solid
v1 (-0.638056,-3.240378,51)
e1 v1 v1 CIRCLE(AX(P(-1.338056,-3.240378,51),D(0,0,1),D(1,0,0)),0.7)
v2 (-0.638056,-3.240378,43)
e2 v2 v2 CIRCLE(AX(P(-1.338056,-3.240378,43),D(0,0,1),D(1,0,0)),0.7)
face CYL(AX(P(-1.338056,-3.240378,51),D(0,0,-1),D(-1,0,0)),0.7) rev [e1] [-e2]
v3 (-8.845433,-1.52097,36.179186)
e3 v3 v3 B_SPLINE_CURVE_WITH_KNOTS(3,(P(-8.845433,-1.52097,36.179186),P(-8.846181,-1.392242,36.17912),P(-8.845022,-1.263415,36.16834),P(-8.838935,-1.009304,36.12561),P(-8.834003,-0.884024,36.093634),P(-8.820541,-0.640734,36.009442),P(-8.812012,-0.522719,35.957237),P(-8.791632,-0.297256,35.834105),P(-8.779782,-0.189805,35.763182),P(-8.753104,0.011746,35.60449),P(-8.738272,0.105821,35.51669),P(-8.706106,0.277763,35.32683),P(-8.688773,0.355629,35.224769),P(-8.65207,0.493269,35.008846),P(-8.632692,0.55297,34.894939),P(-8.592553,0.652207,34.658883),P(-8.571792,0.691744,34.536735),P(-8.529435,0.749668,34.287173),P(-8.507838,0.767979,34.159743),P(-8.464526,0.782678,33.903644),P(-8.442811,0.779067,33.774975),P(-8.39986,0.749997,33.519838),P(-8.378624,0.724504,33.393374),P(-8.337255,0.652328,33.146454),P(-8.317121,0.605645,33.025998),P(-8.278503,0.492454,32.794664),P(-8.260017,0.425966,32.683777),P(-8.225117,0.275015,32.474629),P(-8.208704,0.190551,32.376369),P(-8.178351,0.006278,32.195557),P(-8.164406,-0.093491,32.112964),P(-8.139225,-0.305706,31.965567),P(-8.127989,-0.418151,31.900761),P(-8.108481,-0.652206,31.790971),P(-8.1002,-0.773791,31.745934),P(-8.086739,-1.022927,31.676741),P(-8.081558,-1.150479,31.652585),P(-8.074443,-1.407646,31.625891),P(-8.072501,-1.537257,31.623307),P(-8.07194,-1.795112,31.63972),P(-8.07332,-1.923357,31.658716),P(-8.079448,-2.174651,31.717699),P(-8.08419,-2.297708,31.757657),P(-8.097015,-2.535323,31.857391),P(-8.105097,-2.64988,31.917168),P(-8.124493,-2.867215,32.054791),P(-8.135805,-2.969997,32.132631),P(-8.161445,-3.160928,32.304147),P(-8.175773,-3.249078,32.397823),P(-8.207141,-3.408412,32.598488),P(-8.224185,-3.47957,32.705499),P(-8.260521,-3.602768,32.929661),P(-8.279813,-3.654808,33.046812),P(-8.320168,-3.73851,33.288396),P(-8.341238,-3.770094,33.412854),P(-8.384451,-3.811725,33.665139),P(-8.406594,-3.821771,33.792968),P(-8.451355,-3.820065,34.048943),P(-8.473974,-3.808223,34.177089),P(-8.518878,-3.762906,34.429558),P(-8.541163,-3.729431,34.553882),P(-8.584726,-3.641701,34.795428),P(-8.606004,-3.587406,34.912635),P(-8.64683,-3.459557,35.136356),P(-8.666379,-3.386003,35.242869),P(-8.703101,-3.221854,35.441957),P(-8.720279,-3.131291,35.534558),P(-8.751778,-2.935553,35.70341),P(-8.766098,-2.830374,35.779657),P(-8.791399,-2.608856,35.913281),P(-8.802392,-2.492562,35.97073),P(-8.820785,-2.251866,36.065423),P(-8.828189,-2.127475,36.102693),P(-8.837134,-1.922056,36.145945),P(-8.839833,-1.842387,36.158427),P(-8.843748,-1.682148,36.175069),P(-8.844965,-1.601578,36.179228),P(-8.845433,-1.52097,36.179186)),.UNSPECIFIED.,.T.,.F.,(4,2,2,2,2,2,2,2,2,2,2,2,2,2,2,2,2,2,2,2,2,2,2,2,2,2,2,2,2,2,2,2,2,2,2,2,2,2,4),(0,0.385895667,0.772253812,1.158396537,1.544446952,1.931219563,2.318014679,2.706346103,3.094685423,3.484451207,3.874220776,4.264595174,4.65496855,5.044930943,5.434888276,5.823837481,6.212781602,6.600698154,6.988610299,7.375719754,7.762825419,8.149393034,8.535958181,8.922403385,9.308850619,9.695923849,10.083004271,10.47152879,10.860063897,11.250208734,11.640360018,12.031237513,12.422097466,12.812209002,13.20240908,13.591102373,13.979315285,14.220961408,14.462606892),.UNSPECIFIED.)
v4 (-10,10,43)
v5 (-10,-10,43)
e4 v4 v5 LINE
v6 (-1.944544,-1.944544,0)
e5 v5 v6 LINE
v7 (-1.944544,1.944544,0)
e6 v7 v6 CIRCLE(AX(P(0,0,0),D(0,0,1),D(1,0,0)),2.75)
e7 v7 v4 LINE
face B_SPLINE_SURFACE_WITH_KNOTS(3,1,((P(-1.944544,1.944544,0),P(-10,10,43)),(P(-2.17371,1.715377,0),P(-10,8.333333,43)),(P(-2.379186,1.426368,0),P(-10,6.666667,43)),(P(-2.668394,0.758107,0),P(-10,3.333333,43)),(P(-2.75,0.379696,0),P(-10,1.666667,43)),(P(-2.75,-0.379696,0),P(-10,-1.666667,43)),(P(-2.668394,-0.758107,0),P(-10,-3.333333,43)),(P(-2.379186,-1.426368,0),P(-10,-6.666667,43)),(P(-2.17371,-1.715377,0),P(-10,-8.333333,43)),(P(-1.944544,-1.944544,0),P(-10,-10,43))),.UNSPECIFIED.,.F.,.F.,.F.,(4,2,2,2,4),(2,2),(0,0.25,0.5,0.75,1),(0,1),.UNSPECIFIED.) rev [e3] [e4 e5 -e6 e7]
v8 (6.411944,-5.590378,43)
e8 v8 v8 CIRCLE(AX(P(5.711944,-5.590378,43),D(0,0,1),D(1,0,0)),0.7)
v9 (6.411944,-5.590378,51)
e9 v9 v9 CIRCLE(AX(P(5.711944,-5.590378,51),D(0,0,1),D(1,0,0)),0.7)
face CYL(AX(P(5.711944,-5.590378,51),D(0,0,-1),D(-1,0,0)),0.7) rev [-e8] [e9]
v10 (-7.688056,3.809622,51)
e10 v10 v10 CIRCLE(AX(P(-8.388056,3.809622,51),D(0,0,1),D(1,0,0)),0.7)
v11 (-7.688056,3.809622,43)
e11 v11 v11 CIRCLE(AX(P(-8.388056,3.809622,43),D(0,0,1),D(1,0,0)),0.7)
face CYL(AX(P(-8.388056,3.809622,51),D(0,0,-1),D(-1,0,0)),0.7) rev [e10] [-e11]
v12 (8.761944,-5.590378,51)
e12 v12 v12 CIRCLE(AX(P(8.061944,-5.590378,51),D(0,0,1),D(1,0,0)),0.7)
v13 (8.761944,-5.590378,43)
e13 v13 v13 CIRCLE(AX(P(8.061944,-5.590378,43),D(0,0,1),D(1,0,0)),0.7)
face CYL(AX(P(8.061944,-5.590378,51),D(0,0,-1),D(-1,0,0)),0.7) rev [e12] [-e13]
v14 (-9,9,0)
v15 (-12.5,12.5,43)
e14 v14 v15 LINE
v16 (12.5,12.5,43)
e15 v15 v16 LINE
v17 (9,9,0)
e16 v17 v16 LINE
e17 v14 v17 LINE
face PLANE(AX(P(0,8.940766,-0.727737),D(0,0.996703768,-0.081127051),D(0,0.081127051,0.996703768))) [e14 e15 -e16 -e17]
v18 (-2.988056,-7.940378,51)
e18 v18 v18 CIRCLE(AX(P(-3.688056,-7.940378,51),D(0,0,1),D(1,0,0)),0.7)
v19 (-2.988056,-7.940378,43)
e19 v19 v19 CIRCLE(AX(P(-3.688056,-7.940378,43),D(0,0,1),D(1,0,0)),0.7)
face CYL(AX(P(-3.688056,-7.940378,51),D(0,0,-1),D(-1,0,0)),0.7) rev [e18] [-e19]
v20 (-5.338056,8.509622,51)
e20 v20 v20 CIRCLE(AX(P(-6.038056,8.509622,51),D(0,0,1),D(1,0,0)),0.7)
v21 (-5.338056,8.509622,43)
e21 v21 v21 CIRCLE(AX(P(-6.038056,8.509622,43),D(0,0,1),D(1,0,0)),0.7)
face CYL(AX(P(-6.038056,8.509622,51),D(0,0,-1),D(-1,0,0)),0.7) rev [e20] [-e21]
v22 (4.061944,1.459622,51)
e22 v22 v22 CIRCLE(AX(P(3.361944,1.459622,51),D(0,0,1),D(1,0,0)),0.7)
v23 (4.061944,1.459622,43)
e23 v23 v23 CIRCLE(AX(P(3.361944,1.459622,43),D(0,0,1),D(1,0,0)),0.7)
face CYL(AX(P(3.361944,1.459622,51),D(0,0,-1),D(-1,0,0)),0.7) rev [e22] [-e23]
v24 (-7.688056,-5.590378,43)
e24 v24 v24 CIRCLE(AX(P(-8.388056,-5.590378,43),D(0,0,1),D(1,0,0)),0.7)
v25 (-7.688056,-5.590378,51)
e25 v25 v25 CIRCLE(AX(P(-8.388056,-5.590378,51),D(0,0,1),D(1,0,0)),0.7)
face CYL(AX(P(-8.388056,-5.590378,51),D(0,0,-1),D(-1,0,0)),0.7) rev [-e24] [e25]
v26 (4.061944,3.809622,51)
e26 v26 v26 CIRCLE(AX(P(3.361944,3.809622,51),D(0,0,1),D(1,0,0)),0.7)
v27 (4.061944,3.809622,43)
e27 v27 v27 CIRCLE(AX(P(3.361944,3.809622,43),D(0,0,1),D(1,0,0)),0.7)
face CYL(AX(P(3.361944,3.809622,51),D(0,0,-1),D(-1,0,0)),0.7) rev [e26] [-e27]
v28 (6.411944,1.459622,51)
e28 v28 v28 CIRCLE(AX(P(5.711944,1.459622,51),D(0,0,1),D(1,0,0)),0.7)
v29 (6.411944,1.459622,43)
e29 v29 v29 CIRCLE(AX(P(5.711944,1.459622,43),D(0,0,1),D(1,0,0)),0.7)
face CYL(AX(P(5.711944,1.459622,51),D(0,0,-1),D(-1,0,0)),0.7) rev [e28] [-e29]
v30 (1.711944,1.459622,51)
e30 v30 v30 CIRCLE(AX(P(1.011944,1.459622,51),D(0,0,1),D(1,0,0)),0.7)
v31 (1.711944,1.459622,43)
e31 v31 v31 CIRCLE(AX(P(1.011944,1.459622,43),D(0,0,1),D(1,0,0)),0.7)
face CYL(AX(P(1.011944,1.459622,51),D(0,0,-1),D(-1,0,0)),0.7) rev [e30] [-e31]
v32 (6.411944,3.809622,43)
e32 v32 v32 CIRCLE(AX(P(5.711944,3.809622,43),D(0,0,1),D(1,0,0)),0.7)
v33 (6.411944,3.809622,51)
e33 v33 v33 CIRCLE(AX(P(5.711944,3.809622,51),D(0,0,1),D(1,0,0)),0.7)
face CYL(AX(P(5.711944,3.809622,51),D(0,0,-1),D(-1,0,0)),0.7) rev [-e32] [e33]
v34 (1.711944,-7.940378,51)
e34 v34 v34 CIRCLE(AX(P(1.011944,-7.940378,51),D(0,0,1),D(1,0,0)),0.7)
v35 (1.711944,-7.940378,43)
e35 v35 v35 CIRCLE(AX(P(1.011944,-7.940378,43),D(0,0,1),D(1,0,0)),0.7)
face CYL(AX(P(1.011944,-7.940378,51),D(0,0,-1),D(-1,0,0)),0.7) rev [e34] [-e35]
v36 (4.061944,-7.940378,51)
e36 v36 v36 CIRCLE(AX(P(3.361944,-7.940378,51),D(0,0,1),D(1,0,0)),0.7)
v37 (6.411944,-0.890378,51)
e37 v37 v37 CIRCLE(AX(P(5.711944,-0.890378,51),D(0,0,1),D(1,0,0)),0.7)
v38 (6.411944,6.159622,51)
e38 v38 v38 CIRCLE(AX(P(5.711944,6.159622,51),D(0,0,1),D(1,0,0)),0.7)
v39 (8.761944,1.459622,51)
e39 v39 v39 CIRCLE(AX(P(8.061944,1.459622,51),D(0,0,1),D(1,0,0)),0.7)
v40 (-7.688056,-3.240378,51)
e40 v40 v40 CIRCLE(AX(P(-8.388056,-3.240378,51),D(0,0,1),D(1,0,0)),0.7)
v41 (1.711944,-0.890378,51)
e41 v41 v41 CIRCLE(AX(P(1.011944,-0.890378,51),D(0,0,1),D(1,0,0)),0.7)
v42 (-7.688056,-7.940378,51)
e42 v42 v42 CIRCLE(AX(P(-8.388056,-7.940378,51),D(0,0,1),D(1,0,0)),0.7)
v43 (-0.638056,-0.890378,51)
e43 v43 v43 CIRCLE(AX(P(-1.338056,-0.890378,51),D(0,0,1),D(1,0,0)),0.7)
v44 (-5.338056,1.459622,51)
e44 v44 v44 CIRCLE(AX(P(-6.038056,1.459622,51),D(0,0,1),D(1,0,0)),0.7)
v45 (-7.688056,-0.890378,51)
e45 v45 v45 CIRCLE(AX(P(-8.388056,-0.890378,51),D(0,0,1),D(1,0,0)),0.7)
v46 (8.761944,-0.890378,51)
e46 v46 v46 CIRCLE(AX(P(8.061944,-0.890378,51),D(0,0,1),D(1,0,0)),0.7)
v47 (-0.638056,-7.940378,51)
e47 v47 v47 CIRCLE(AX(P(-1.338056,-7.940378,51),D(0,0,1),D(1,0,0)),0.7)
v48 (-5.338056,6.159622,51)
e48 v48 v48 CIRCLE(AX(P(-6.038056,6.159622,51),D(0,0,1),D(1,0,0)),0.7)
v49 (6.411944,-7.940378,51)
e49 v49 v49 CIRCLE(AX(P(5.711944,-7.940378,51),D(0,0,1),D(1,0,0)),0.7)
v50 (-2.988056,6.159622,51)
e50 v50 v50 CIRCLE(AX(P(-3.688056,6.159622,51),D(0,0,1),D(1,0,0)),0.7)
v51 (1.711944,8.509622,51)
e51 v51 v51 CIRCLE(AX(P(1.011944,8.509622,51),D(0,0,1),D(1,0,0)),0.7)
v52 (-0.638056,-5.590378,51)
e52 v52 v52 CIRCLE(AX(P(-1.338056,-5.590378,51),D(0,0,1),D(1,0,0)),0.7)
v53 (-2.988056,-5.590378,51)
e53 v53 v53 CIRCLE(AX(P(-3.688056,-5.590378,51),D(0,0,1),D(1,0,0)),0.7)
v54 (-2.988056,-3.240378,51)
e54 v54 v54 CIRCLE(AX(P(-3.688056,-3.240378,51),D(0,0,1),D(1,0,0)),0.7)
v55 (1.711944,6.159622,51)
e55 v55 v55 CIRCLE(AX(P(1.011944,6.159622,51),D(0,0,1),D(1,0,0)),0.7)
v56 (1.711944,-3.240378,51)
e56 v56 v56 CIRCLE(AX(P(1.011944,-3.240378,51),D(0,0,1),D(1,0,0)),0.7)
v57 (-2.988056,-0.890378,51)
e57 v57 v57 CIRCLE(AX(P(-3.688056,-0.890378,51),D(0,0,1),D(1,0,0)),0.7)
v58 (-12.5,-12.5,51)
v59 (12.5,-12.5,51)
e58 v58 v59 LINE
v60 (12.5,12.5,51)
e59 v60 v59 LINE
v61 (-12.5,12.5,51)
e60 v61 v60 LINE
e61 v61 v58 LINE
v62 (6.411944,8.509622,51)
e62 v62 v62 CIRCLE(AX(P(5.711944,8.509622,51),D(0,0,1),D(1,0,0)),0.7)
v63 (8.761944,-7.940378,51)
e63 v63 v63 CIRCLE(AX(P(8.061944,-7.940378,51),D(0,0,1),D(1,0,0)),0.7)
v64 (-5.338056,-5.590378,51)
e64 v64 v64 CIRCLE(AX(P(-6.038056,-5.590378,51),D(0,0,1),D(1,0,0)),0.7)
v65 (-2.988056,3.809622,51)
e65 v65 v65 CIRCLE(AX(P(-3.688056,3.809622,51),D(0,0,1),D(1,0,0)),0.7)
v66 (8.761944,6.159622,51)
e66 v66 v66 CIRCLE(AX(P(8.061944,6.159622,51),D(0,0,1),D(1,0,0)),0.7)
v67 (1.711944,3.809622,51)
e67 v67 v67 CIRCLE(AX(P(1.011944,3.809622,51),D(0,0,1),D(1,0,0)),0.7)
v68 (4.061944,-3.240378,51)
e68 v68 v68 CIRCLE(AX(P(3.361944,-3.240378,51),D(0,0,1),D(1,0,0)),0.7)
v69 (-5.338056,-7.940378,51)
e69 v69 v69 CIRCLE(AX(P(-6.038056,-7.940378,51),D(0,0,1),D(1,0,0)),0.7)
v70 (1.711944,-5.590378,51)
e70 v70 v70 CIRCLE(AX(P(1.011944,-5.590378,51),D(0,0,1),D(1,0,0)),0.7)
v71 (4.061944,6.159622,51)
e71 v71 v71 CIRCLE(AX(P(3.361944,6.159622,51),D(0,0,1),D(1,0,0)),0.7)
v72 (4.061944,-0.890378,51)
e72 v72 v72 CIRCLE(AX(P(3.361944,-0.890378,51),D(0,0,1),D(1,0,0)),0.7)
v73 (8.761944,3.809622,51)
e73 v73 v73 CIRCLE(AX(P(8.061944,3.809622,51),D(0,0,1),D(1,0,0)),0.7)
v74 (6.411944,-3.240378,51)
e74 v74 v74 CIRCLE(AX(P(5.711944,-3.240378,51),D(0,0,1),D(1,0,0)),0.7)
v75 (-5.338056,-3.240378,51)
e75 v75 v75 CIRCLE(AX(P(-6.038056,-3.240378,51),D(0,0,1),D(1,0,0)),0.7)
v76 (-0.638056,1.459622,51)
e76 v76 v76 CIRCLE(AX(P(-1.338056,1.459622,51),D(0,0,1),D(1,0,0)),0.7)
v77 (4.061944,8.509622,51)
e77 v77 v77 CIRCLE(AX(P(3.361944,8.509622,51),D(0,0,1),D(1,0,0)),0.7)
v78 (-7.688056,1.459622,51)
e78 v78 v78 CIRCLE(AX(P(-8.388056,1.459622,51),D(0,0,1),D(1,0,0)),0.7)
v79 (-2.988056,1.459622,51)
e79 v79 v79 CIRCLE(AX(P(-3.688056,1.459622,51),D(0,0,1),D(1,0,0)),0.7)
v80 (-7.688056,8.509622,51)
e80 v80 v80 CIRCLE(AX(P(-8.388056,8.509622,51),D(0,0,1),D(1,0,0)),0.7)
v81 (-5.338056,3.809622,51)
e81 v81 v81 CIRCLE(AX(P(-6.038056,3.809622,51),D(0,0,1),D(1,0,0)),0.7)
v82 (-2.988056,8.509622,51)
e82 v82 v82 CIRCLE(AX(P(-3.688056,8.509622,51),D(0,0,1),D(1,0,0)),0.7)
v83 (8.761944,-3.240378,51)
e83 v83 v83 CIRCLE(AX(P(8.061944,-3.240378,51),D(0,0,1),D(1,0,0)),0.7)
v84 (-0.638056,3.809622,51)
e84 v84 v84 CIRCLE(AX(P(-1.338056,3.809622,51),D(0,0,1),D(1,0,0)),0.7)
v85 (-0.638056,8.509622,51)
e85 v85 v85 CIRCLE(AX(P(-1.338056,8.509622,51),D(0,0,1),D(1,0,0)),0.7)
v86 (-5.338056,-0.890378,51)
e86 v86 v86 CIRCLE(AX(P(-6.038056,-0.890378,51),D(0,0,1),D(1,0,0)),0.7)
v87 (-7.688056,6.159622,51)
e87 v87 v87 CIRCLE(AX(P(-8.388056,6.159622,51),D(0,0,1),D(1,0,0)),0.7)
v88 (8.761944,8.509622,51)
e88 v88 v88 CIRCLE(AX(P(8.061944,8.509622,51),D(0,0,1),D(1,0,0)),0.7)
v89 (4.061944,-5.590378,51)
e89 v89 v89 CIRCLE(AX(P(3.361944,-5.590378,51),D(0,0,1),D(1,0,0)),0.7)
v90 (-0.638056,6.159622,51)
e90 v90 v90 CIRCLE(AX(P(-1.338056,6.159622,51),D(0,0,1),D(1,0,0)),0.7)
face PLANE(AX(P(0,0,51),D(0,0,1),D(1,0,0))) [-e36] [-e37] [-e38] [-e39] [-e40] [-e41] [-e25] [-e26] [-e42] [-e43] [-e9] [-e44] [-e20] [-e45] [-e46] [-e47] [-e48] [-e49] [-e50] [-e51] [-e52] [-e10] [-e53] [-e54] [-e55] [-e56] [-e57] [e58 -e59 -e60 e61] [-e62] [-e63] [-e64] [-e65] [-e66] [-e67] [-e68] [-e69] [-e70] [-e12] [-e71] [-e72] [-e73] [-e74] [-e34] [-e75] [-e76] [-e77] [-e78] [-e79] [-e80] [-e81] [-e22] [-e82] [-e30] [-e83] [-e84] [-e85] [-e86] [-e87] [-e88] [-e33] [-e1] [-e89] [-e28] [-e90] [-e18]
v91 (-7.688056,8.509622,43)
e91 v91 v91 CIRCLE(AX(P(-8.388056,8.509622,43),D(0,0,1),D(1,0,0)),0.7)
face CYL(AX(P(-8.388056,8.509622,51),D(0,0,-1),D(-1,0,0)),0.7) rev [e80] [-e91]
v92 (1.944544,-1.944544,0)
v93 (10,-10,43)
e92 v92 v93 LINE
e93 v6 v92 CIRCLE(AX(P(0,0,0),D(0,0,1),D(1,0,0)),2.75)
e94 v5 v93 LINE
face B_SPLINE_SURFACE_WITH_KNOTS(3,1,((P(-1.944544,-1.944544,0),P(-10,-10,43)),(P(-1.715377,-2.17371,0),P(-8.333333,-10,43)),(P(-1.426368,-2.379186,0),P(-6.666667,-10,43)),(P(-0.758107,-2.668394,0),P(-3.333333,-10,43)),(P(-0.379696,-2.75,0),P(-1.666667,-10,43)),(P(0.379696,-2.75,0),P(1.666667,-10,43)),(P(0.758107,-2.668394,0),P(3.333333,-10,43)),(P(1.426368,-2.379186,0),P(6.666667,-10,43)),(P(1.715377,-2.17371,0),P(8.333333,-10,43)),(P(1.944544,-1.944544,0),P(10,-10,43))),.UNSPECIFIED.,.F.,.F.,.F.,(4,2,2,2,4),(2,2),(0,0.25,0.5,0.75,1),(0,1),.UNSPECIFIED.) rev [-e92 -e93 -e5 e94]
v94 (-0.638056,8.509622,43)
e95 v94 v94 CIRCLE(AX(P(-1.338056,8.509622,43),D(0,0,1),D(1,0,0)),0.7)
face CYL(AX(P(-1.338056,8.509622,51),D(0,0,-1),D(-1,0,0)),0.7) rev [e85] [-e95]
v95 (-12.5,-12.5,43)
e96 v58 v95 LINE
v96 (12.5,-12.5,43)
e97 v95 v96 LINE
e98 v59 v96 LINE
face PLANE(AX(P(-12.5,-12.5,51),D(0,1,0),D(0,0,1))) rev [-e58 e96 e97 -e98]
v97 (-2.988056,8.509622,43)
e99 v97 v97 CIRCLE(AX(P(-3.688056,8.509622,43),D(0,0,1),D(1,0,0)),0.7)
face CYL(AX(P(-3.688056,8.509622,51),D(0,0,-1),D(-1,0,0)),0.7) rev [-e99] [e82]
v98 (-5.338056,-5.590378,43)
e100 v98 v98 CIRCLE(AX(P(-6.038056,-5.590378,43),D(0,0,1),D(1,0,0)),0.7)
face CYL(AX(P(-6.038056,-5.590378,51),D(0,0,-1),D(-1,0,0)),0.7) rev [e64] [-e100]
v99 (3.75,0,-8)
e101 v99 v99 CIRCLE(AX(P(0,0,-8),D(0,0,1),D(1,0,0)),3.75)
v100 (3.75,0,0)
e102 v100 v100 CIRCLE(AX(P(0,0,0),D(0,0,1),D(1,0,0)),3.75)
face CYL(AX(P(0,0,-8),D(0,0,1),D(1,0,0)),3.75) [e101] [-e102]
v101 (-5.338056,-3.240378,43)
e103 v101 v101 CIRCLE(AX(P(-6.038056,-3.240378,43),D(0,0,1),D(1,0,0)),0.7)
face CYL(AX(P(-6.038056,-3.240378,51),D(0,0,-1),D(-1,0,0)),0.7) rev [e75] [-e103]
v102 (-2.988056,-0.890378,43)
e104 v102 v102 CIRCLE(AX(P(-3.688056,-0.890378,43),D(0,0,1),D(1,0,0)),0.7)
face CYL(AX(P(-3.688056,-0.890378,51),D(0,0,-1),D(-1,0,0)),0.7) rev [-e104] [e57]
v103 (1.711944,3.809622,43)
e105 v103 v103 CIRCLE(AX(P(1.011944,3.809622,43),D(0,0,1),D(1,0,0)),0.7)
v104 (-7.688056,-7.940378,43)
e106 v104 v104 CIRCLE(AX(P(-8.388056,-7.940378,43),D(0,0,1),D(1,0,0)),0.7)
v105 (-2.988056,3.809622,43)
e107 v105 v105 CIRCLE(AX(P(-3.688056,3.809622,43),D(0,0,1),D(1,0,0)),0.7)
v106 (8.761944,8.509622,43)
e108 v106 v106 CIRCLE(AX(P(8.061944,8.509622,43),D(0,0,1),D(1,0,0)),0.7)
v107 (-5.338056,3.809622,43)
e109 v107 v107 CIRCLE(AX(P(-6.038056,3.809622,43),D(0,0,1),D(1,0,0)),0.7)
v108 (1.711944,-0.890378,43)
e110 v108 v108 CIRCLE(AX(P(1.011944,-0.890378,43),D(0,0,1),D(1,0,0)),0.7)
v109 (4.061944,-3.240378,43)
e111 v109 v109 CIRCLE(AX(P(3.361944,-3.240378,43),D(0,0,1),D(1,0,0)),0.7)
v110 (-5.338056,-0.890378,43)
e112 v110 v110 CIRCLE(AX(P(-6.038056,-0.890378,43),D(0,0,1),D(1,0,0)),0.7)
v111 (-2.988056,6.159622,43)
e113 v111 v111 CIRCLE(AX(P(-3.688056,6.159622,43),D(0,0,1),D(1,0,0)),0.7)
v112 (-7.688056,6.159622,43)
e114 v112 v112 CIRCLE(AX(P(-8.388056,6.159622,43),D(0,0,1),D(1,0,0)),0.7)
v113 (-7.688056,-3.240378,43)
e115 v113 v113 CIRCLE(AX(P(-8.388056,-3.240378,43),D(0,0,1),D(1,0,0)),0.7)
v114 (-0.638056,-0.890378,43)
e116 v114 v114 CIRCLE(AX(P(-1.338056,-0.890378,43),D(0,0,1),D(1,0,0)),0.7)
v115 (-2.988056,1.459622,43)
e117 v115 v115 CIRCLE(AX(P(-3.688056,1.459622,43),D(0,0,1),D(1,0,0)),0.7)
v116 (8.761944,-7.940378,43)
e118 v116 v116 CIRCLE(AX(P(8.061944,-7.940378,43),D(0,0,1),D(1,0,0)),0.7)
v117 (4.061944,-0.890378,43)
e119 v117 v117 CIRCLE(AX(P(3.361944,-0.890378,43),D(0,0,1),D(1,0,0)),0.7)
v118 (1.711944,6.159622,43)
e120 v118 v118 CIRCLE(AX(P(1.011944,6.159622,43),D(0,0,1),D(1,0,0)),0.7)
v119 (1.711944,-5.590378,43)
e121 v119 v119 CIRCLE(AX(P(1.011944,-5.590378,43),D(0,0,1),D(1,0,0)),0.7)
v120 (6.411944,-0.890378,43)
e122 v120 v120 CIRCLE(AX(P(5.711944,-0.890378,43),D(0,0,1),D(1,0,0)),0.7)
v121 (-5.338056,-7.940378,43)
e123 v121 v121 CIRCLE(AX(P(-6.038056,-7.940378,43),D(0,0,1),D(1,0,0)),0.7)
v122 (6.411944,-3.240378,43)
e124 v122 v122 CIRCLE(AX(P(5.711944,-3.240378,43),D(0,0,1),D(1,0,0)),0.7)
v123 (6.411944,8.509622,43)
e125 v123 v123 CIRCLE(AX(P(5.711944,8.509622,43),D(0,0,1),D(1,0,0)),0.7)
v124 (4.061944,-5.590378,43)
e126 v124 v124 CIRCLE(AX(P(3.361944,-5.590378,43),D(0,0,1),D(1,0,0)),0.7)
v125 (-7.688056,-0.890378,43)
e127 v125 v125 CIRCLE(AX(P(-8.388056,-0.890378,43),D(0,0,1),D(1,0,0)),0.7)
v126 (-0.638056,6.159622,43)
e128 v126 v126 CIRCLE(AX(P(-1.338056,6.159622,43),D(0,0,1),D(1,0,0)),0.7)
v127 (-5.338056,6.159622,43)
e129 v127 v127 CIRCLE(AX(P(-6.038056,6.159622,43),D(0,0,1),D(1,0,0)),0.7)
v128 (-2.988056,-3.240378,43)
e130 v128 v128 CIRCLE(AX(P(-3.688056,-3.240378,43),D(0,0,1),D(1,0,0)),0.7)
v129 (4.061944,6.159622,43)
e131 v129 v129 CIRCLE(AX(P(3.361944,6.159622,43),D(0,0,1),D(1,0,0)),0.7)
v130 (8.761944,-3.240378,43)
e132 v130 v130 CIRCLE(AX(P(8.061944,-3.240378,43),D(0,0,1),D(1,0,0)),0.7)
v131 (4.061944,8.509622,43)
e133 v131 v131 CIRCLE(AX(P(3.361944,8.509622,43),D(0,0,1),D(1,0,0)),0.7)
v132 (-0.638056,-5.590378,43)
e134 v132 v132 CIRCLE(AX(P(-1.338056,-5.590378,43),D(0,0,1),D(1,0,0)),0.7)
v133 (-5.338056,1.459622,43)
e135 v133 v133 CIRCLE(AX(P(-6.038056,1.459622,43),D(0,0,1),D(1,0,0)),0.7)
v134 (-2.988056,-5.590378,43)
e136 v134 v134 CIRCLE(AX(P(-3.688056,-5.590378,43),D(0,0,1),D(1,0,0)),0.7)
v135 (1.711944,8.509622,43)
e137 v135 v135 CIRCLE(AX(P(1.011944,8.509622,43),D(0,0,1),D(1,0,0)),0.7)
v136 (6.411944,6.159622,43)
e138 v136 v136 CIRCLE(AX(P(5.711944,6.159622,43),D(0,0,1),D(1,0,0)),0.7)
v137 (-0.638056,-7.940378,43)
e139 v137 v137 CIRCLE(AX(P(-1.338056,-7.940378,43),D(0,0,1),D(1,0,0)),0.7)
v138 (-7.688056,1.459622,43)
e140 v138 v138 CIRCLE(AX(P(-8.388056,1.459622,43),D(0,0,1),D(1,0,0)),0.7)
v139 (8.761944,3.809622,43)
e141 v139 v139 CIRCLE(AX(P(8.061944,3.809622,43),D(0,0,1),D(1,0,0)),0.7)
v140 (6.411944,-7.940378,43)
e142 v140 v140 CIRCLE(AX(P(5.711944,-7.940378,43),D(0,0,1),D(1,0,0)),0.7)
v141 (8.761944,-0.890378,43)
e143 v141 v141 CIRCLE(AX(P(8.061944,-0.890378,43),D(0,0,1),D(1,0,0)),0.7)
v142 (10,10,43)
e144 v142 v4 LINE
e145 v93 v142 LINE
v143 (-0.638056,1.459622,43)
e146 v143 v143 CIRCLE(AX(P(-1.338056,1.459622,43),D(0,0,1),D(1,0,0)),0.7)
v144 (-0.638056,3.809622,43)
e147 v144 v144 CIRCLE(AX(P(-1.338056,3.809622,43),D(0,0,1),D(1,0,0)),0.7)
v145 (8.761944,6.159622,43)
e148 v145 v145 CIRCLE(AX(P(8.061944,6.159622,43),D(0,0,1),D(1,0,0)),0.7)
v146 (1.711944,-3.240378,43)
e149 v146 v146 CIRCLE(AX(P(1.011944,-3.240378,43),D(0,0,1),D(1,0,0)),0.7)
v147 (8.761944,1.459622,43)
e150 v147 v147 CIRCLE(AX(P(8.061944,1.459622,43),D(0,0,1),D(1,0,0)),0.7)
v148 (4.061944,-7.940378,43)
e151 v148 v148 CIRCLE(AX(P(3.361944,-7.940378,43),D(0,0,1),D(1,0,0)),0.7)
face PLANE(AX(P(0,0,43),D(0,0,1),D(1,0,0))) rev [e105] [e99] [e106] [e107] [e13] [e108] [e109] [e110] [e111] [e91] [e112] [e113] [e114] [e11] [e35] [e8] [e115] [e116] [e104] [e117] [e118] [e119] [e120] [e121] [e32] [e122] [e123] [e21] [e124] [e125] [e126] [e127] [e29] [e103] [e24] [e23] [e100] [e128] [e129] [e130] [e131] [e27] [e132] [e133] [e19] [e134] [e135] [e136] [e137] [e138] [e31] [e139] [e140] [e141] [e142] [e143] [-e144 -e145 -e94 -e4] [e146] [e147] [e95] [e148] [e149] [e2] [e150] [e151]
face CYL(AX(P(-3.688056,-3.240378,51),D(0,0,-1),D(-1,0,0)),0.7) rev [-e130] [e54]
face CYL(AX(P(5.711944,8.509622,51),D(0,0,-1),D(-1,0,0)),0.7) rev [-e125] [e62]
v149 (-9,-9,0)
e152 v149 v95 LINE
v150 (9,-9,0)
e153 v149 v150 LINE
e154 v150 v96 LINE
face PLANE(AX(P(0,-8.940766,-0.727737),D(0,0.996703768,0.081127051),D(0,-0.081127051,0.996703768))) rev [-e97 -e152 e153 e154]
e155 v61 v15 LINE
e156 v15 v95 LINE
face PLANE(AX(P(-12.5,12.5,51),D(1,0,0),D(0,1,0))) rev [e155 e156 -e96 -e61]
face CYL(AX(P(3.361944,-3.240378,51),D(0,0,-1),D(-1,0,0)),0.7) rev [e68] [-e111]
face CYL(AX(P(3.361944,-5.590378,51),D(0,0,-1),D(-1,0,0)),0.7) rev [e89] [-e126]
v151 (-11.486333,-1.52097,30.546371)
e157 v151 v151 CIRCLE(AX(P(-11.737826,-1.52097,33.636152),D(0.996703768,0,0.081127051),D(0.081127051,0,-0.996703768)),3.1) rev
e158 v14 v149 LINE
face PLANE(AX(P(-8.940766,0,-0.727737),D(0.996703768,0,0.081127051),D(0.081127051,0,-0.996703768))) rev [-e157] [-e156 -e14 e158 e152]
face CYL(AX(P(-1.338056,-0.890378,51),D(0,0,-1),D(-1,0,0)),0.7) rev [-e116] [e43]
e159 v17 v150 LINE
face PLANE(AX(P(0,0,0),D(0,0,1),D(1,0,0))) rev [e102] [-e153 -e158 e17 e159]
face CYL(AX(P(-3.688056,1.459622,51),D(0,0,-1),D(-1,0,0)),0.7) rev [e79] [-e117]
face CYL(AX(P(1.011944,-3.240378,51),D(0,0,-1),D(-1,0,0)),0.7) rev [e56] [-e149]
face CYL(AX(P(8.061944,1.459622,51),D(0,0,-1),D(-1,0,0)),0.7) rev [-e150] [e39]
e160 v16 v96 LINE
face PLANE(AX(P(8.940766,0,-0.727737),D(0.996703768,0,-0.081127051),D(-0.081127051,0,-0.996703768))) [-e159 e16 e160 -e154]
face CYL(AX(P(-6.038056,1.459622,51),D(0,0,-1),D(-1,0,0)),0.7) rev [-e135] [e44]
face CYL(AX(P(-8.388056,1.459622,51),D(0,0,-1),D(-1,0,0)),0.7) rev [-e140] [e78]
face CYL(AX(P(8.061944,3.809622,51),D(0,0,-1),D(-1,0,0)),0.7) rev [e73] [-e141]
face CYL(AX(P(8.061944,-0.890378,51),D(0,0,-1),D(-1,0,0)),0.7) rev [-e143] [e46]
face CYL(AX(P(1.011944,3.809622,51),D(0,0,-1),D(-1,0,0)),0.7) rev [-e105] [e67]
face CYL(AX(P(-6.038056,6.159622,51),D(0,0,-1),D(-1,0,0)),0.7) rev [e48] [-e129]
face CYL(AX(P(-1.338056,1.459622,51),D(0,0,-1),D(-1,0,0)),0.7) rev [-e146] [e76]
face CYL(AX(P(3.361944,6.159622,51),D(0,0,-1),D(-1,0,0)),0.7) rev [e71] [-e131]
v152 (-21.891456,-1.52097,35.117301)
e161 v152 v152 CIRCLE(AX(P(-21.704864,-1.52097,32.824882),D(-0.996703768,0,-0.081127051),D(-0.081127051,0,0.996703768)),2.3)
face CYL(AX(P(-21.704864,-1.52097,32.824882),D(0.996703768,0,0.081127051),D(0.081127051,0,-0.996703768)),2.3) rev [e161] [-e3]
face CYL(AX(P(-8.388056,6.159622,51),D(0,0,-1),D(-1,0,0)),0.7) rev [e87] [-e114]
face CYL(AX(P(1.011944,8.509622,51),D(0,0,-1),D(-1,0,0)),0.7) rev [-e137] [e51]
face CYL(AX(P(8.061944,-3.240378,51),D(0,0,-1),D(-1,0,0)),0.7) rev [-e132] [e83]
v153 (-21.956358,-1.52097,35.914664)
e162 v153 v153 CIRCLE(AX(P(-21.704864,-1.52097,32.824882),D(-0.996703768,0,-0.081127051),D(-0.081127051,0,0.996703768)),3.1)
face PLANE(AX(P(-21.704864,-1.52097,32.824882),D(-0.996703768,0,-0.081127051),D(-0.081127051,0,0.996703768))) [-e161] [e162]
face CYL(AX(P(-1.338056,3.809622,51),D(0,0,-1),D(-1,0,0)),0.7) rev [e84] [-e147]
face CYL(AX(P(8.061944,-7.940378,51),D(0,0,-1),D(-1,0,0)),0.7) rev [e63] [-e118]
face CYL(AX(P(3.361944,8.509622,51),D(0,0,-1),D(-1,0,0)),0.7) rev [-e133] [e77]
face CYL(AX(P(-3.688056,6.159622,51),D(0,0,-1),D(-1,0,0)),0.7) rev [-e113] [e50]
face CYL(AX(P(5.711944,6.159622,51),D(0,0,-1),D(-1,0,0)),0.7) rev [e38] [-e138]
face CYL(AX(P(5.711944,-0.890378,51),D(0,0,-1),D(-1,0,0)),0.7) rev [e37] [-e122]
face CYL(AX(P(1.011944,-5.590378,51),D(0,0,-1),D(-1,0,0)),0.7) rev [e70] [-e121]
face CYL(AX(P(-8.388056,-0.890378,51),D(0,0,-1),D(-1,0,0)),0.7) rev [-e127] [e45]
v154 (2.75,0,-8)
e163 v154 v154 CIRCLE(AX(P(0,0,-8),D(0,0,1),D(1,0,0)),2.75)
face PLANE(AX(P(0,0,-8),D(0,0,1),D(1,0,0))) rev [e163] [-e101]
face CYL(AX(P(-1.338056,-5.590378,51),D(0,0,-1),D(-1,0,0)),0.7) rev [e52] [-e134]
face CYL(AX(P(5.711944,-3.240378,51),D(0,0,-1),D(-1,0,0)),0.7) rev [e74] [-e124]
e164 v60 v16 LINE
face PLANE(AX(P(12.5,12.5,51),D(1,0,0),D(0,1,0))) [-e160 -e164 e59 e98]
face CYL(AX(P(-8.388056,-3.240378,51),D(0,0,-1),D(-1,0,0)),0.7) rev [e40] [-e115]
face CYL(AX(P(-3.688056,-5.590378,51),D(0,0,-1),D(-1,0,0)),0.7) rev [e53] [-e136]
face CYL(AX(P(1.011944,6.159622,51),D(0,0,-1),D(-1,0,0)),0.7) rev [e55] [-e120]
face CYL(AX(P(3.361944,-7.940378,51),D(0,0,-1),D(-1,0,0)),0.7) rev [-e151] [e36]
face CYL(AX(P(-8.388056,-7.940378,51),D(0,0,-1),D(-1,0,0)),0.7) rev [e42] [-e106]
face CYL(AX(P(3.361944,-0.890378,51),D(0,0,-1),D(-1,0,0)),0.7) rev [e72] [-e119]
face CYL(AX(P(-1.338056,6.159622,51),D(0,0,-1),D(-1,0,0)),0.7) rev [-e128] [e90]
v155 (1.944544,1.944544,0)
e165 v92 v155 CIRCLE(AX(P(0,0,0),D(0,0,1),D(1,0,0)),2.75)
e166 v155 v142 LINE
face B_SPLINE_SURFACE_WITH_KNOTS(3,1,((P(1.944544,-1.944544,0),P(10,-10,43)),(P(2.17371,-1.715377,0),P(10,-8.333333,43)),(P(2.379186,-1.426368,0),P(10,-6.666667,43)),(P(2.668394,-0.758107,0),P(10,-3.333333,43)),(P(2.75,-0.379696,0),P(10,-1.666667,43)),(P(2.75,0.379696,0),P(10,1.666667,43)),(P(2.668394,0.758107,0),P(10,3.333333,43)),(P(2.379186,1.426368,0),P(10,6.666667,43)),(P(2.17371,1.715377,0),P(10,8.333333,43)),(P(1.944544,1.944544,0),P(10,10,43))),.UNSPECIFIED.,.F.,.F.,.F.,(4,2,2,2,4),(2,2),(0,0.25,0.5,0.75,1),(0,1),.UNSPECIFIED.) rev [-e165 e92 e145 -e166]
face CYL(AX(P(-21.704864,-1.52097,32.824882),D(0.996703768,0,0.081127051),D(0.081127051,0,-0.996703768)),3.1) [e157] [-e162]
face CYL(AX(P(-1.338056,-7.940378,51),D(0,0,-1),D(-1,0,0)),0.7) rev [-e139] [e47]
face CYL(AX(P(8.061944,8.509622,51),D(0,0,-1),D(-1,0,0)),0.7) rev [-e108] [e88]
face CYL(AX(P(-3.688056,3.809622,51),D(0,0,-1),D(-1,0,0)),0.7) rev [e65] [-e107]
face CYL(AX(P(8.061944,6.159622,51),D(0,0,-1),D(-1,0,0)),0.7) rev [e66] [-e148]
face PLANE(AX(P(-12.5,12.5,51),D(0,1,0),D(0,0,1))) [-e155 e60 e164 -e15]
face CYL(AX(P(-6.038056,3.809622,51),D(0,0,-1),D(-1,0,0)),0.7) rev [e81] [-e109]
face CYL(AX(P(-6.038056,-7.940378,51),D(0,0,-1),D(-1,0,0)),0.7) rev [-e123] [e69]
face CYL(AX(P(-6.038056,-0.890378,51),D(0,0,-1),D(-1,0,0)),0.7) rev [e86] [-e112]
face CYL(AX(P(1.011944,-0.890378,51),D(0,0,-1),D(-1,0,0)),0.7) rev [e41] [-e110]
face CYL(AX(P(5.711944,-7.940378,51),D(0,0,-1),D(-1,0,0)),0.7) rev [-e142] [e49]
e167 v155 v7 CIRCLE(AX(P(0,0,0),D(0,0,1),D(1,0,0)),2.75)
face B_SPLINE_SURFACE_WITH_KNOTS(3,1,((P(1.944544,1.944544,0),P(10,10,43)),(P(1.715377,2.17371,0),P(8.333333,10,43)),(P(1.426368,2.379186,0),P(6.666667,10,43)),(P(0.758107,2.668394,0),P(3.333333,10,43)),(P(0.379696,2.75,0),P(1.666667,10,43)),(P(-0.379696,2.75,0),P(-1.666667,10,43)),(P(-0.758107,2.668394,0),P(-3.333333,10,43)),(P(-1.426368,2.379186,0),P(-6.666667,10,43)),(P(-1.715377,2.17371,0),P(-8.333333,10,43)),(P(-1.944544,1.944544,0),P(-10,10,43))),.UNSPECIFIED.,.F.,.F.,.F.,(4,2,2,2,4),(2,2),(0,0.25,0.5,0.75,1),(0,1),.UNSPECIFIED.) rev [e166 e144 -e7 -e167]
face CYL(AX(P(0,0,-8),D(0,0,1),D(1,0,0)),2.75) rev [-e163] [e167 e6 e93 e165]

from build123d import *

# Parameters (mm, degrees)
SKETCH2_4_W         = 25
SKETCH2_4_H         = 25
BOSS_EXTRUDE2_DEPTH = 8
SKETCH5_R           = 0.7
CUT_EXTRUDE1_DEPTH  = 8
SKETCH6_R           = 3.1
SKETCH6_R_2         = 2.3
BOSS_EXTRUDE4_DEPTH = 10
CUT_EXTRUDE2_START  = -4
SKETCH6_4_R         = 2.3
CUT_EXTRUDE2_DEPTH  = 4
SKETCH1_7_R         = 3.75
SKETCH1_7_R_2       = 2.75
BOSS_EXTRUDE7_DEPTH = 8


with BuildPart() as part:
    # Sketch1 → Loft1 section 0
    with BuildSketch(Plane.XY):
        with BuildLine():
            Line((-9, 9), (9, 9))
            Line((9, 9), (9, -9))
            Line((9, -9), (-9, -9))
            Line((-9, -9), (-9, 9))
        make_face()
    # Sketch2 → Loft1 section 1
    with BuildSketch(Plane.XY.offset(43)):
        with BuildLine():
            Line((-12.5, 12.5), (12.5, 12.5))
            Line((12.5, 12.5), (12.5, -12.5))
            Line((12.5, -12.5), (-12.5, -12.5))
            Line((-12.5, -12.5), (-12.5, 12.5))
        make_face()
    loft()

    # Cut-Loft1: read off the stored shape, not the designer's step
    # Cut-Loft1: loft between two sections, ruled curve by curve
    cut_loft1_from = [
        Edge.make_bspline([(-1.944543648, -1.944543648, 0), (-1.715376982, -2.173710315, 0), (-1.426368467, -2.37918614, 0), (-0.758106945, -2.668394189, 0), (-0.379695766, -2.75, 0), (0.379695766, -2.75, 0), (0.758106945, -2.668394189, 0), (1.426368467, -2.37918614, 0), (1.715376982, -2.173710315, 0), (1.944543648, -1.944543648, 0)], [0, 0, 0, 0, 0.25, 0.25, 0.5, 0.5, 0.75, 0.75, 1, 1, 1, 1], 3),
        Edge.make_bspline([(1.944543648, -1.944543648, 0), (2.173710315, -1.715376982, 0), (2.37918614, -1.426368467, 0), (2.668394189, -0.758106945, 0), (2.75, -0.379695766, 0), (2.75, 0.379695766, 0), (2.668394189, 0.758106945, 0), (2.37918614, 1.426368467, 0), (2.173710315, 1.715376982, 0), (1.944543648, 1.944543648, 0)], [0, 0, 0, 0, 0.25, 0.25, 0.5, 0.5, 0.75, 0.75, 1, 1, 1, 1], 3),
        Edge.make_bspline([(-1.944543648, 1.944543648, 0), (-2.173710315, 1.715376982, 0), (-2.37918614, 1.426368467, 0), (-2.668394189, 0.758106945, 0), (-2.75, 0.379695766, 0), (-2.75, -0.379695766, 0), (-2.668394189, -0.758106945, 0), (-2.37918614, -1.426368467, 0), (-2.173710315, -1.715376982, 0), (-1.944543648, -1.944543648, 0)], [0, 0, 0, 0, 0.25, 0.25, 0.5, 0.5, 0.75, 0.75, 1, 1, 1, 1], 3),
        Edge.make_bspline([(1.944543648, 1.944543648, 0), (1.715376982, 2.173710315, 0), (1.426368467, 2.37918614, 0), (0.758106945, 2.668394189, 0), (0.379695766, 2.75, 0), (-0.379695766, 2.75, 0), (-0.758106945, 2.668394189, 0), (-1.426368467, 2.37918614, 0), (-1.715376982, 2.173710315, 0), (-1.944543648, 1.944543648, 0)], [0, 0, 0, 0, 0.25, 0.25, 0.5, 0.5, 0.75, 0.75, 1, 1, 1, 1], 3),
    ]
    cut_loft1_to = [
        Edge.make_bspline([(-10, -10, 43), (-8.333333333, -10, 43), (-6.666666667, -10, 43), (-3.333333333, -10, 43), (-1.666666667, -10, 43), (1.666666667, -10, 43), (3.333333333, -10, 43), (6.666666667, -10, 43), (8.333333333, -10, 43), (10, -10, 43)], [0, 0, 0, 0, 0.25, 0.25, 0.5, 0.5, 0.75, 0.75, 1, 1, 1, 1], 3),
        Edge.make_bspline([(10, -10, 43), (10, -8.333333333, 43), (10, -6.666666667, 43), (10, -3.333333333, 43), (10, -1.666666667, 43), (10, 1.666666667, 43), (10, 3.333333333, 43), (10, 6.666666667, 43), (10, 8.333333333, 43), (10, 10, 43)], [0, 0, 0, 0, 0.25, 0.25, 0.5, 0.5, 0.75, 0.75, 1, 1, 1, 1], 3),
        Edge.make_bspline([(-10, 10, 43), (-10, 8.333333333, 43), (-10, 6.666666667, 43), (-10, 3.333333333, 43), (-10, 1.666666667, 43), (-10, -1.666666667, 43), (-10, -3.333333333, 43), (-10, -6.666666667, 43), (-10, -8.333333333, 43), (-10, -10, 43)], [0, 0, 0, 0, 0.25, 0.25, 0.5, 0.5, 0.75, 0.75, 1, 1, 1, 1], 3),
        Edge.make_bspline([(10, 10, 43), (8.333333333, 10, 43), (6.666666667, 10, 43), (3.333333333, 10, 43), (1.666666667, 10, 43), (-1.666666667, 10, 43), (-3.333333333, 10, 43), (-6.666666667, 10, 43), (-8.333333333, 10, 43), (-10, 10, 43)], [0, 0, 0, 0, 0.25, 0.25, 0.5, 0.5, 0.75, 0.75, 1, 1, 1, 1], 3),
    ]
    cut_loft1 = Solid(Shell([*[Face.make_surface_from_curves(cut_loft1_from[k], cut_loft1_to[k]) for k in range(4)], Face(Wire(cut_loft1_from)), Face(Wire(cut_loft1_to))]))
    add(cut_loft1, mode=Mode.SUBTRACT)

    # Sketch2<4> → Boss-Extrude2 (add)
    with BuildSketch(Plane.XY.offset(43)):
        Rectangle(SKETCH2_4_W, SKETCH2_4_H)
    extrude(amount=BOSS_EXTRUDE2_DEPTH)

    # Sketch5 → Cut-Extrude1 (cut)
    with BuildSketch(Plane.XY.offset(43)):
        with Locations((-8.388056057, 8.509622087)):
            Circle(SKETCH5_R)
        with Locations((-6.038056057, 8.509622087)):
            Circle(SKETCH5_R)
        with Locations((-3.688056057, 8.509622087)):
            Circle(SKETCH5_R)
        with Locations((-1.338056057, 8.509622087)):
            Circle(SKETCH5_R)
        with Locations((1.011943943, 8.509622087)):
            Circle(SKETCH5_R)
        with Locations((3.361943943, 8.509622087)):
            Circle(SKETCH5_R)
        with Locations((5.711943943, 8.509622087)):
            Circle(SKETCH5_R)
        with Locations((8.061943943, 8.509622087)):
            Circle(SKETCH5_R)
        with Locations((-6.038056057, 6.159622087)):
            Circle(SKETCH5_R)
        with Locations((-3.688056057, 6.159622087)):
            Circle(SKETCH5_R)
        with Locations((-1.338056057, 6.159622087)):
            Circle(SKETCH5_R)
        with Locations((1.011943943, 6.159622087)):
            Circle(SKETCH5_R)
        with Locations((3.361943943, 6.159622087)):
            Circle(SKETCH5_R)
        with Locations((5.711943943, 6.159622087)):
            Circle(SKETCH5_R)
        with Locations((8.061943943, 6.159622087)):
            Circle(SKETCH5_R)
        with Locations((-6.038056057, 3.809622087)):
            Circle(SKETCH5_R)
        with Locations((-3.688056057, 3.809622087)):
            Circle(SKETCH5_R)
        with Locations((-1.338056057, 3.809622087)):
            Circle(SKETCH5_R)
        with Locations((1.011943943, 3.809622087)):
            Circle(SKETCH5_R)
        with Locations((3.361943943, 3.809622087)):
            Circle(SKETCH5_R)
        with Locations((5.711943943, 3.809622087)):
            Circle(SKETCH5_R)
        with Locations((8.061943943, 3.809622087)):
            Circle(SKETCH5_R)
        with Locations((-6.038056057, 1.459622087)):
            Circle(SKETCH5_R)
        with Locations((-3.688056057, 1.459622087)):
            Circle(SKETCH5_R)
        with Locations((-1.338056057, 1.459622087)):
            Circle(SKETCH5_R)
        with Locations((1.011943943, 1.459622087)):
            Circle(SKETCH5_R)
        with Locations((3.361943943, 1.459622087)):
            Circle(SKETCH5_R)
        with Locations((5.711943943, 1.459622087)):
            Circle(SKETCH5_R)
        with Locations((8.061943943, 1.459622087)):
            Circle(SKETCH5_R)
        with Locations((-6.038056057, -0.890377913)):
            Circle(SKETCH5_R)
        with Locations((-3.688056057, -0.890377913)):
            Circle(SKETCH5_R)
        with Locations((-1.338056057, -0.890377913)):
            Circle(SKETCH5_R)
        with Locations((1.011943943, -0.890377913)):
            Circle(SKETCH5_R)
        with Locations((3.361943943, -0.890377913)):
            Circle(SKETCH5_R)
        with Locations((5.711943943, -0.890377913)):
            Circle(SKETCH5_R)
        with Locations((8.061943943, -0.890377913)):
            Circle(SKETCH5_R)
        with Locations((-6.038056057, -3.240377913)):
            Circle(SKETCH5_R)
        with Locations((-3.688056057, -3.240377913)):
            Circle(SKETCH5_R)
        with Locations((-1.338056057, -3.240377913)):
            Circle(SKETCH5_R)
        with Locations((1.011943943, -3.240377913)):
            Circle(SKETCH5_R)
        with Locations((3.361943943, -3.240377913)):
            Circle(SKETCH5_R)
        with Locations((5.711943943, -3.240377913)):
            Circle(SKETCH5_R)
        with Locations((8.061943943, -3.240377913)):
            Circle(SKETCH5_R)
        with Locations((-6.038056057, -5.590377913)):
            Circle(SKETCH5_R)
        with Locations((-3.688056057, -5.590377913)):
            Circle(SKETCH5_R)
        with Locations((-1.338056057, -5.590377913)):
            Circle(SKETCH5_R)
        with Locations((1.011943943, -5.590377913)):
            Circle(SKETCH5_R)
        with Locations((3.361943943, -5.590377913)):
            Circle(SKETCH5_R)
        with Locations((5.711943943, -5.590377913)):
            Circle(SKETCH5_R)
        with Locations((8.061943943, -5.590377913)):
            Circle(SKETCH5_R)
        with Locations((-6.038056057, -7.940377913)):
            Circle(SKETCH5_R)
        with Locations((-3.688056057, -7.940377913)):
            Circle(SKETCH5_R)
        with Locations((-1.338056057, -7.940377913)):
            Circle(SKETCH5_R)
        with Locations((1.011943943, -7.940377913)):
            Circle(SKETCH5_R)
        with Locations((3.361943943, -7.940377913)):
            Circle(SKETCH5_R)
        with Locations((5.711943943, -7.940377913)):
            Circle(SKETCH5_R)
        with Locations((8.061943943, -7.940377913)):
            Circle(SKETCH5_R)
        with Locations((-8.388056057, 6.159622087)):
            Circle(SKETCH5_R)
        with Locations((-8.388056057, 3.809622087)):
            Circle(SKETCH5_R)
        with Locations((-8.388056057, 1.459622087)):
            Circle(SKETCH5_R)
        with Locations((-8.388056057, -0.890377913)):
            Circle(SKETCH5_R)
        with Locations((-8.388056057, -3.240377913)):
            Circle(SKETCH5_R)
        with Locations((-8.388056057, -5.590377913)):
            Circle(SKETCH5_R)
        with Locations((-8.388056057, -7.940377913)):
            Circle(SKETCH5_R)
    extrude(amount=CUT_EXTRUDE1_DEPTH, mode=Mode.SUBTRACT)

    # Sketch6 → Boss-Extrude4 (add)
    with BuildSketch(Plane(origin=(-8.940765615, 0, -0.727736736), x_dir=(-0.08112705090276601, 0, 0.9967037682339824), z_dir=(-0.9967037682339824, 0, -0.08112705090276602))):
        with Locations(Location((34.477535136, -1.520969622, 0), (0, 0, 180))):
            Circle(SKETCH6_R)
        with Locations((34.477535136, -1.520969622)):
            Circle(SKETCH6_R_2, mode=Mode.SUBTRACT)
    extrude(amount=BOSS_EXTRUDE4_DEPTH)

    # Sketch6<4> → Cut-Extrude2 (cut)
    with BuildSketch(Plane(origin=(-8.940765615, 0, -0.727736736), x_dir=(-0.08112705090276601, 0, 0.9967037682339824), z_dir=(-0.9967037682339824, 0, -0.08112705090276602)).offset(CUT_EXTRUDE2_START)):
        with Locations((34.477535136, -1.520969622)):
            Circle(SKETCH6_4_R)
    extrude(amount=CUT_EXTRUDE2_DEPTH, mode=Mode.SUBTRACT)

    # Sketch1<7> → Boss-Extrude7 (add)
    with BuildSketch(Plane.XY):
        Circle(SKETCH1_7_R)
        Circle(SKETCH1_7_R_2, mode=Mode.SUBTRACT)
    extrude(amount=-BOSS_EXTRUDE7_DEPTH)


solid = part.part
